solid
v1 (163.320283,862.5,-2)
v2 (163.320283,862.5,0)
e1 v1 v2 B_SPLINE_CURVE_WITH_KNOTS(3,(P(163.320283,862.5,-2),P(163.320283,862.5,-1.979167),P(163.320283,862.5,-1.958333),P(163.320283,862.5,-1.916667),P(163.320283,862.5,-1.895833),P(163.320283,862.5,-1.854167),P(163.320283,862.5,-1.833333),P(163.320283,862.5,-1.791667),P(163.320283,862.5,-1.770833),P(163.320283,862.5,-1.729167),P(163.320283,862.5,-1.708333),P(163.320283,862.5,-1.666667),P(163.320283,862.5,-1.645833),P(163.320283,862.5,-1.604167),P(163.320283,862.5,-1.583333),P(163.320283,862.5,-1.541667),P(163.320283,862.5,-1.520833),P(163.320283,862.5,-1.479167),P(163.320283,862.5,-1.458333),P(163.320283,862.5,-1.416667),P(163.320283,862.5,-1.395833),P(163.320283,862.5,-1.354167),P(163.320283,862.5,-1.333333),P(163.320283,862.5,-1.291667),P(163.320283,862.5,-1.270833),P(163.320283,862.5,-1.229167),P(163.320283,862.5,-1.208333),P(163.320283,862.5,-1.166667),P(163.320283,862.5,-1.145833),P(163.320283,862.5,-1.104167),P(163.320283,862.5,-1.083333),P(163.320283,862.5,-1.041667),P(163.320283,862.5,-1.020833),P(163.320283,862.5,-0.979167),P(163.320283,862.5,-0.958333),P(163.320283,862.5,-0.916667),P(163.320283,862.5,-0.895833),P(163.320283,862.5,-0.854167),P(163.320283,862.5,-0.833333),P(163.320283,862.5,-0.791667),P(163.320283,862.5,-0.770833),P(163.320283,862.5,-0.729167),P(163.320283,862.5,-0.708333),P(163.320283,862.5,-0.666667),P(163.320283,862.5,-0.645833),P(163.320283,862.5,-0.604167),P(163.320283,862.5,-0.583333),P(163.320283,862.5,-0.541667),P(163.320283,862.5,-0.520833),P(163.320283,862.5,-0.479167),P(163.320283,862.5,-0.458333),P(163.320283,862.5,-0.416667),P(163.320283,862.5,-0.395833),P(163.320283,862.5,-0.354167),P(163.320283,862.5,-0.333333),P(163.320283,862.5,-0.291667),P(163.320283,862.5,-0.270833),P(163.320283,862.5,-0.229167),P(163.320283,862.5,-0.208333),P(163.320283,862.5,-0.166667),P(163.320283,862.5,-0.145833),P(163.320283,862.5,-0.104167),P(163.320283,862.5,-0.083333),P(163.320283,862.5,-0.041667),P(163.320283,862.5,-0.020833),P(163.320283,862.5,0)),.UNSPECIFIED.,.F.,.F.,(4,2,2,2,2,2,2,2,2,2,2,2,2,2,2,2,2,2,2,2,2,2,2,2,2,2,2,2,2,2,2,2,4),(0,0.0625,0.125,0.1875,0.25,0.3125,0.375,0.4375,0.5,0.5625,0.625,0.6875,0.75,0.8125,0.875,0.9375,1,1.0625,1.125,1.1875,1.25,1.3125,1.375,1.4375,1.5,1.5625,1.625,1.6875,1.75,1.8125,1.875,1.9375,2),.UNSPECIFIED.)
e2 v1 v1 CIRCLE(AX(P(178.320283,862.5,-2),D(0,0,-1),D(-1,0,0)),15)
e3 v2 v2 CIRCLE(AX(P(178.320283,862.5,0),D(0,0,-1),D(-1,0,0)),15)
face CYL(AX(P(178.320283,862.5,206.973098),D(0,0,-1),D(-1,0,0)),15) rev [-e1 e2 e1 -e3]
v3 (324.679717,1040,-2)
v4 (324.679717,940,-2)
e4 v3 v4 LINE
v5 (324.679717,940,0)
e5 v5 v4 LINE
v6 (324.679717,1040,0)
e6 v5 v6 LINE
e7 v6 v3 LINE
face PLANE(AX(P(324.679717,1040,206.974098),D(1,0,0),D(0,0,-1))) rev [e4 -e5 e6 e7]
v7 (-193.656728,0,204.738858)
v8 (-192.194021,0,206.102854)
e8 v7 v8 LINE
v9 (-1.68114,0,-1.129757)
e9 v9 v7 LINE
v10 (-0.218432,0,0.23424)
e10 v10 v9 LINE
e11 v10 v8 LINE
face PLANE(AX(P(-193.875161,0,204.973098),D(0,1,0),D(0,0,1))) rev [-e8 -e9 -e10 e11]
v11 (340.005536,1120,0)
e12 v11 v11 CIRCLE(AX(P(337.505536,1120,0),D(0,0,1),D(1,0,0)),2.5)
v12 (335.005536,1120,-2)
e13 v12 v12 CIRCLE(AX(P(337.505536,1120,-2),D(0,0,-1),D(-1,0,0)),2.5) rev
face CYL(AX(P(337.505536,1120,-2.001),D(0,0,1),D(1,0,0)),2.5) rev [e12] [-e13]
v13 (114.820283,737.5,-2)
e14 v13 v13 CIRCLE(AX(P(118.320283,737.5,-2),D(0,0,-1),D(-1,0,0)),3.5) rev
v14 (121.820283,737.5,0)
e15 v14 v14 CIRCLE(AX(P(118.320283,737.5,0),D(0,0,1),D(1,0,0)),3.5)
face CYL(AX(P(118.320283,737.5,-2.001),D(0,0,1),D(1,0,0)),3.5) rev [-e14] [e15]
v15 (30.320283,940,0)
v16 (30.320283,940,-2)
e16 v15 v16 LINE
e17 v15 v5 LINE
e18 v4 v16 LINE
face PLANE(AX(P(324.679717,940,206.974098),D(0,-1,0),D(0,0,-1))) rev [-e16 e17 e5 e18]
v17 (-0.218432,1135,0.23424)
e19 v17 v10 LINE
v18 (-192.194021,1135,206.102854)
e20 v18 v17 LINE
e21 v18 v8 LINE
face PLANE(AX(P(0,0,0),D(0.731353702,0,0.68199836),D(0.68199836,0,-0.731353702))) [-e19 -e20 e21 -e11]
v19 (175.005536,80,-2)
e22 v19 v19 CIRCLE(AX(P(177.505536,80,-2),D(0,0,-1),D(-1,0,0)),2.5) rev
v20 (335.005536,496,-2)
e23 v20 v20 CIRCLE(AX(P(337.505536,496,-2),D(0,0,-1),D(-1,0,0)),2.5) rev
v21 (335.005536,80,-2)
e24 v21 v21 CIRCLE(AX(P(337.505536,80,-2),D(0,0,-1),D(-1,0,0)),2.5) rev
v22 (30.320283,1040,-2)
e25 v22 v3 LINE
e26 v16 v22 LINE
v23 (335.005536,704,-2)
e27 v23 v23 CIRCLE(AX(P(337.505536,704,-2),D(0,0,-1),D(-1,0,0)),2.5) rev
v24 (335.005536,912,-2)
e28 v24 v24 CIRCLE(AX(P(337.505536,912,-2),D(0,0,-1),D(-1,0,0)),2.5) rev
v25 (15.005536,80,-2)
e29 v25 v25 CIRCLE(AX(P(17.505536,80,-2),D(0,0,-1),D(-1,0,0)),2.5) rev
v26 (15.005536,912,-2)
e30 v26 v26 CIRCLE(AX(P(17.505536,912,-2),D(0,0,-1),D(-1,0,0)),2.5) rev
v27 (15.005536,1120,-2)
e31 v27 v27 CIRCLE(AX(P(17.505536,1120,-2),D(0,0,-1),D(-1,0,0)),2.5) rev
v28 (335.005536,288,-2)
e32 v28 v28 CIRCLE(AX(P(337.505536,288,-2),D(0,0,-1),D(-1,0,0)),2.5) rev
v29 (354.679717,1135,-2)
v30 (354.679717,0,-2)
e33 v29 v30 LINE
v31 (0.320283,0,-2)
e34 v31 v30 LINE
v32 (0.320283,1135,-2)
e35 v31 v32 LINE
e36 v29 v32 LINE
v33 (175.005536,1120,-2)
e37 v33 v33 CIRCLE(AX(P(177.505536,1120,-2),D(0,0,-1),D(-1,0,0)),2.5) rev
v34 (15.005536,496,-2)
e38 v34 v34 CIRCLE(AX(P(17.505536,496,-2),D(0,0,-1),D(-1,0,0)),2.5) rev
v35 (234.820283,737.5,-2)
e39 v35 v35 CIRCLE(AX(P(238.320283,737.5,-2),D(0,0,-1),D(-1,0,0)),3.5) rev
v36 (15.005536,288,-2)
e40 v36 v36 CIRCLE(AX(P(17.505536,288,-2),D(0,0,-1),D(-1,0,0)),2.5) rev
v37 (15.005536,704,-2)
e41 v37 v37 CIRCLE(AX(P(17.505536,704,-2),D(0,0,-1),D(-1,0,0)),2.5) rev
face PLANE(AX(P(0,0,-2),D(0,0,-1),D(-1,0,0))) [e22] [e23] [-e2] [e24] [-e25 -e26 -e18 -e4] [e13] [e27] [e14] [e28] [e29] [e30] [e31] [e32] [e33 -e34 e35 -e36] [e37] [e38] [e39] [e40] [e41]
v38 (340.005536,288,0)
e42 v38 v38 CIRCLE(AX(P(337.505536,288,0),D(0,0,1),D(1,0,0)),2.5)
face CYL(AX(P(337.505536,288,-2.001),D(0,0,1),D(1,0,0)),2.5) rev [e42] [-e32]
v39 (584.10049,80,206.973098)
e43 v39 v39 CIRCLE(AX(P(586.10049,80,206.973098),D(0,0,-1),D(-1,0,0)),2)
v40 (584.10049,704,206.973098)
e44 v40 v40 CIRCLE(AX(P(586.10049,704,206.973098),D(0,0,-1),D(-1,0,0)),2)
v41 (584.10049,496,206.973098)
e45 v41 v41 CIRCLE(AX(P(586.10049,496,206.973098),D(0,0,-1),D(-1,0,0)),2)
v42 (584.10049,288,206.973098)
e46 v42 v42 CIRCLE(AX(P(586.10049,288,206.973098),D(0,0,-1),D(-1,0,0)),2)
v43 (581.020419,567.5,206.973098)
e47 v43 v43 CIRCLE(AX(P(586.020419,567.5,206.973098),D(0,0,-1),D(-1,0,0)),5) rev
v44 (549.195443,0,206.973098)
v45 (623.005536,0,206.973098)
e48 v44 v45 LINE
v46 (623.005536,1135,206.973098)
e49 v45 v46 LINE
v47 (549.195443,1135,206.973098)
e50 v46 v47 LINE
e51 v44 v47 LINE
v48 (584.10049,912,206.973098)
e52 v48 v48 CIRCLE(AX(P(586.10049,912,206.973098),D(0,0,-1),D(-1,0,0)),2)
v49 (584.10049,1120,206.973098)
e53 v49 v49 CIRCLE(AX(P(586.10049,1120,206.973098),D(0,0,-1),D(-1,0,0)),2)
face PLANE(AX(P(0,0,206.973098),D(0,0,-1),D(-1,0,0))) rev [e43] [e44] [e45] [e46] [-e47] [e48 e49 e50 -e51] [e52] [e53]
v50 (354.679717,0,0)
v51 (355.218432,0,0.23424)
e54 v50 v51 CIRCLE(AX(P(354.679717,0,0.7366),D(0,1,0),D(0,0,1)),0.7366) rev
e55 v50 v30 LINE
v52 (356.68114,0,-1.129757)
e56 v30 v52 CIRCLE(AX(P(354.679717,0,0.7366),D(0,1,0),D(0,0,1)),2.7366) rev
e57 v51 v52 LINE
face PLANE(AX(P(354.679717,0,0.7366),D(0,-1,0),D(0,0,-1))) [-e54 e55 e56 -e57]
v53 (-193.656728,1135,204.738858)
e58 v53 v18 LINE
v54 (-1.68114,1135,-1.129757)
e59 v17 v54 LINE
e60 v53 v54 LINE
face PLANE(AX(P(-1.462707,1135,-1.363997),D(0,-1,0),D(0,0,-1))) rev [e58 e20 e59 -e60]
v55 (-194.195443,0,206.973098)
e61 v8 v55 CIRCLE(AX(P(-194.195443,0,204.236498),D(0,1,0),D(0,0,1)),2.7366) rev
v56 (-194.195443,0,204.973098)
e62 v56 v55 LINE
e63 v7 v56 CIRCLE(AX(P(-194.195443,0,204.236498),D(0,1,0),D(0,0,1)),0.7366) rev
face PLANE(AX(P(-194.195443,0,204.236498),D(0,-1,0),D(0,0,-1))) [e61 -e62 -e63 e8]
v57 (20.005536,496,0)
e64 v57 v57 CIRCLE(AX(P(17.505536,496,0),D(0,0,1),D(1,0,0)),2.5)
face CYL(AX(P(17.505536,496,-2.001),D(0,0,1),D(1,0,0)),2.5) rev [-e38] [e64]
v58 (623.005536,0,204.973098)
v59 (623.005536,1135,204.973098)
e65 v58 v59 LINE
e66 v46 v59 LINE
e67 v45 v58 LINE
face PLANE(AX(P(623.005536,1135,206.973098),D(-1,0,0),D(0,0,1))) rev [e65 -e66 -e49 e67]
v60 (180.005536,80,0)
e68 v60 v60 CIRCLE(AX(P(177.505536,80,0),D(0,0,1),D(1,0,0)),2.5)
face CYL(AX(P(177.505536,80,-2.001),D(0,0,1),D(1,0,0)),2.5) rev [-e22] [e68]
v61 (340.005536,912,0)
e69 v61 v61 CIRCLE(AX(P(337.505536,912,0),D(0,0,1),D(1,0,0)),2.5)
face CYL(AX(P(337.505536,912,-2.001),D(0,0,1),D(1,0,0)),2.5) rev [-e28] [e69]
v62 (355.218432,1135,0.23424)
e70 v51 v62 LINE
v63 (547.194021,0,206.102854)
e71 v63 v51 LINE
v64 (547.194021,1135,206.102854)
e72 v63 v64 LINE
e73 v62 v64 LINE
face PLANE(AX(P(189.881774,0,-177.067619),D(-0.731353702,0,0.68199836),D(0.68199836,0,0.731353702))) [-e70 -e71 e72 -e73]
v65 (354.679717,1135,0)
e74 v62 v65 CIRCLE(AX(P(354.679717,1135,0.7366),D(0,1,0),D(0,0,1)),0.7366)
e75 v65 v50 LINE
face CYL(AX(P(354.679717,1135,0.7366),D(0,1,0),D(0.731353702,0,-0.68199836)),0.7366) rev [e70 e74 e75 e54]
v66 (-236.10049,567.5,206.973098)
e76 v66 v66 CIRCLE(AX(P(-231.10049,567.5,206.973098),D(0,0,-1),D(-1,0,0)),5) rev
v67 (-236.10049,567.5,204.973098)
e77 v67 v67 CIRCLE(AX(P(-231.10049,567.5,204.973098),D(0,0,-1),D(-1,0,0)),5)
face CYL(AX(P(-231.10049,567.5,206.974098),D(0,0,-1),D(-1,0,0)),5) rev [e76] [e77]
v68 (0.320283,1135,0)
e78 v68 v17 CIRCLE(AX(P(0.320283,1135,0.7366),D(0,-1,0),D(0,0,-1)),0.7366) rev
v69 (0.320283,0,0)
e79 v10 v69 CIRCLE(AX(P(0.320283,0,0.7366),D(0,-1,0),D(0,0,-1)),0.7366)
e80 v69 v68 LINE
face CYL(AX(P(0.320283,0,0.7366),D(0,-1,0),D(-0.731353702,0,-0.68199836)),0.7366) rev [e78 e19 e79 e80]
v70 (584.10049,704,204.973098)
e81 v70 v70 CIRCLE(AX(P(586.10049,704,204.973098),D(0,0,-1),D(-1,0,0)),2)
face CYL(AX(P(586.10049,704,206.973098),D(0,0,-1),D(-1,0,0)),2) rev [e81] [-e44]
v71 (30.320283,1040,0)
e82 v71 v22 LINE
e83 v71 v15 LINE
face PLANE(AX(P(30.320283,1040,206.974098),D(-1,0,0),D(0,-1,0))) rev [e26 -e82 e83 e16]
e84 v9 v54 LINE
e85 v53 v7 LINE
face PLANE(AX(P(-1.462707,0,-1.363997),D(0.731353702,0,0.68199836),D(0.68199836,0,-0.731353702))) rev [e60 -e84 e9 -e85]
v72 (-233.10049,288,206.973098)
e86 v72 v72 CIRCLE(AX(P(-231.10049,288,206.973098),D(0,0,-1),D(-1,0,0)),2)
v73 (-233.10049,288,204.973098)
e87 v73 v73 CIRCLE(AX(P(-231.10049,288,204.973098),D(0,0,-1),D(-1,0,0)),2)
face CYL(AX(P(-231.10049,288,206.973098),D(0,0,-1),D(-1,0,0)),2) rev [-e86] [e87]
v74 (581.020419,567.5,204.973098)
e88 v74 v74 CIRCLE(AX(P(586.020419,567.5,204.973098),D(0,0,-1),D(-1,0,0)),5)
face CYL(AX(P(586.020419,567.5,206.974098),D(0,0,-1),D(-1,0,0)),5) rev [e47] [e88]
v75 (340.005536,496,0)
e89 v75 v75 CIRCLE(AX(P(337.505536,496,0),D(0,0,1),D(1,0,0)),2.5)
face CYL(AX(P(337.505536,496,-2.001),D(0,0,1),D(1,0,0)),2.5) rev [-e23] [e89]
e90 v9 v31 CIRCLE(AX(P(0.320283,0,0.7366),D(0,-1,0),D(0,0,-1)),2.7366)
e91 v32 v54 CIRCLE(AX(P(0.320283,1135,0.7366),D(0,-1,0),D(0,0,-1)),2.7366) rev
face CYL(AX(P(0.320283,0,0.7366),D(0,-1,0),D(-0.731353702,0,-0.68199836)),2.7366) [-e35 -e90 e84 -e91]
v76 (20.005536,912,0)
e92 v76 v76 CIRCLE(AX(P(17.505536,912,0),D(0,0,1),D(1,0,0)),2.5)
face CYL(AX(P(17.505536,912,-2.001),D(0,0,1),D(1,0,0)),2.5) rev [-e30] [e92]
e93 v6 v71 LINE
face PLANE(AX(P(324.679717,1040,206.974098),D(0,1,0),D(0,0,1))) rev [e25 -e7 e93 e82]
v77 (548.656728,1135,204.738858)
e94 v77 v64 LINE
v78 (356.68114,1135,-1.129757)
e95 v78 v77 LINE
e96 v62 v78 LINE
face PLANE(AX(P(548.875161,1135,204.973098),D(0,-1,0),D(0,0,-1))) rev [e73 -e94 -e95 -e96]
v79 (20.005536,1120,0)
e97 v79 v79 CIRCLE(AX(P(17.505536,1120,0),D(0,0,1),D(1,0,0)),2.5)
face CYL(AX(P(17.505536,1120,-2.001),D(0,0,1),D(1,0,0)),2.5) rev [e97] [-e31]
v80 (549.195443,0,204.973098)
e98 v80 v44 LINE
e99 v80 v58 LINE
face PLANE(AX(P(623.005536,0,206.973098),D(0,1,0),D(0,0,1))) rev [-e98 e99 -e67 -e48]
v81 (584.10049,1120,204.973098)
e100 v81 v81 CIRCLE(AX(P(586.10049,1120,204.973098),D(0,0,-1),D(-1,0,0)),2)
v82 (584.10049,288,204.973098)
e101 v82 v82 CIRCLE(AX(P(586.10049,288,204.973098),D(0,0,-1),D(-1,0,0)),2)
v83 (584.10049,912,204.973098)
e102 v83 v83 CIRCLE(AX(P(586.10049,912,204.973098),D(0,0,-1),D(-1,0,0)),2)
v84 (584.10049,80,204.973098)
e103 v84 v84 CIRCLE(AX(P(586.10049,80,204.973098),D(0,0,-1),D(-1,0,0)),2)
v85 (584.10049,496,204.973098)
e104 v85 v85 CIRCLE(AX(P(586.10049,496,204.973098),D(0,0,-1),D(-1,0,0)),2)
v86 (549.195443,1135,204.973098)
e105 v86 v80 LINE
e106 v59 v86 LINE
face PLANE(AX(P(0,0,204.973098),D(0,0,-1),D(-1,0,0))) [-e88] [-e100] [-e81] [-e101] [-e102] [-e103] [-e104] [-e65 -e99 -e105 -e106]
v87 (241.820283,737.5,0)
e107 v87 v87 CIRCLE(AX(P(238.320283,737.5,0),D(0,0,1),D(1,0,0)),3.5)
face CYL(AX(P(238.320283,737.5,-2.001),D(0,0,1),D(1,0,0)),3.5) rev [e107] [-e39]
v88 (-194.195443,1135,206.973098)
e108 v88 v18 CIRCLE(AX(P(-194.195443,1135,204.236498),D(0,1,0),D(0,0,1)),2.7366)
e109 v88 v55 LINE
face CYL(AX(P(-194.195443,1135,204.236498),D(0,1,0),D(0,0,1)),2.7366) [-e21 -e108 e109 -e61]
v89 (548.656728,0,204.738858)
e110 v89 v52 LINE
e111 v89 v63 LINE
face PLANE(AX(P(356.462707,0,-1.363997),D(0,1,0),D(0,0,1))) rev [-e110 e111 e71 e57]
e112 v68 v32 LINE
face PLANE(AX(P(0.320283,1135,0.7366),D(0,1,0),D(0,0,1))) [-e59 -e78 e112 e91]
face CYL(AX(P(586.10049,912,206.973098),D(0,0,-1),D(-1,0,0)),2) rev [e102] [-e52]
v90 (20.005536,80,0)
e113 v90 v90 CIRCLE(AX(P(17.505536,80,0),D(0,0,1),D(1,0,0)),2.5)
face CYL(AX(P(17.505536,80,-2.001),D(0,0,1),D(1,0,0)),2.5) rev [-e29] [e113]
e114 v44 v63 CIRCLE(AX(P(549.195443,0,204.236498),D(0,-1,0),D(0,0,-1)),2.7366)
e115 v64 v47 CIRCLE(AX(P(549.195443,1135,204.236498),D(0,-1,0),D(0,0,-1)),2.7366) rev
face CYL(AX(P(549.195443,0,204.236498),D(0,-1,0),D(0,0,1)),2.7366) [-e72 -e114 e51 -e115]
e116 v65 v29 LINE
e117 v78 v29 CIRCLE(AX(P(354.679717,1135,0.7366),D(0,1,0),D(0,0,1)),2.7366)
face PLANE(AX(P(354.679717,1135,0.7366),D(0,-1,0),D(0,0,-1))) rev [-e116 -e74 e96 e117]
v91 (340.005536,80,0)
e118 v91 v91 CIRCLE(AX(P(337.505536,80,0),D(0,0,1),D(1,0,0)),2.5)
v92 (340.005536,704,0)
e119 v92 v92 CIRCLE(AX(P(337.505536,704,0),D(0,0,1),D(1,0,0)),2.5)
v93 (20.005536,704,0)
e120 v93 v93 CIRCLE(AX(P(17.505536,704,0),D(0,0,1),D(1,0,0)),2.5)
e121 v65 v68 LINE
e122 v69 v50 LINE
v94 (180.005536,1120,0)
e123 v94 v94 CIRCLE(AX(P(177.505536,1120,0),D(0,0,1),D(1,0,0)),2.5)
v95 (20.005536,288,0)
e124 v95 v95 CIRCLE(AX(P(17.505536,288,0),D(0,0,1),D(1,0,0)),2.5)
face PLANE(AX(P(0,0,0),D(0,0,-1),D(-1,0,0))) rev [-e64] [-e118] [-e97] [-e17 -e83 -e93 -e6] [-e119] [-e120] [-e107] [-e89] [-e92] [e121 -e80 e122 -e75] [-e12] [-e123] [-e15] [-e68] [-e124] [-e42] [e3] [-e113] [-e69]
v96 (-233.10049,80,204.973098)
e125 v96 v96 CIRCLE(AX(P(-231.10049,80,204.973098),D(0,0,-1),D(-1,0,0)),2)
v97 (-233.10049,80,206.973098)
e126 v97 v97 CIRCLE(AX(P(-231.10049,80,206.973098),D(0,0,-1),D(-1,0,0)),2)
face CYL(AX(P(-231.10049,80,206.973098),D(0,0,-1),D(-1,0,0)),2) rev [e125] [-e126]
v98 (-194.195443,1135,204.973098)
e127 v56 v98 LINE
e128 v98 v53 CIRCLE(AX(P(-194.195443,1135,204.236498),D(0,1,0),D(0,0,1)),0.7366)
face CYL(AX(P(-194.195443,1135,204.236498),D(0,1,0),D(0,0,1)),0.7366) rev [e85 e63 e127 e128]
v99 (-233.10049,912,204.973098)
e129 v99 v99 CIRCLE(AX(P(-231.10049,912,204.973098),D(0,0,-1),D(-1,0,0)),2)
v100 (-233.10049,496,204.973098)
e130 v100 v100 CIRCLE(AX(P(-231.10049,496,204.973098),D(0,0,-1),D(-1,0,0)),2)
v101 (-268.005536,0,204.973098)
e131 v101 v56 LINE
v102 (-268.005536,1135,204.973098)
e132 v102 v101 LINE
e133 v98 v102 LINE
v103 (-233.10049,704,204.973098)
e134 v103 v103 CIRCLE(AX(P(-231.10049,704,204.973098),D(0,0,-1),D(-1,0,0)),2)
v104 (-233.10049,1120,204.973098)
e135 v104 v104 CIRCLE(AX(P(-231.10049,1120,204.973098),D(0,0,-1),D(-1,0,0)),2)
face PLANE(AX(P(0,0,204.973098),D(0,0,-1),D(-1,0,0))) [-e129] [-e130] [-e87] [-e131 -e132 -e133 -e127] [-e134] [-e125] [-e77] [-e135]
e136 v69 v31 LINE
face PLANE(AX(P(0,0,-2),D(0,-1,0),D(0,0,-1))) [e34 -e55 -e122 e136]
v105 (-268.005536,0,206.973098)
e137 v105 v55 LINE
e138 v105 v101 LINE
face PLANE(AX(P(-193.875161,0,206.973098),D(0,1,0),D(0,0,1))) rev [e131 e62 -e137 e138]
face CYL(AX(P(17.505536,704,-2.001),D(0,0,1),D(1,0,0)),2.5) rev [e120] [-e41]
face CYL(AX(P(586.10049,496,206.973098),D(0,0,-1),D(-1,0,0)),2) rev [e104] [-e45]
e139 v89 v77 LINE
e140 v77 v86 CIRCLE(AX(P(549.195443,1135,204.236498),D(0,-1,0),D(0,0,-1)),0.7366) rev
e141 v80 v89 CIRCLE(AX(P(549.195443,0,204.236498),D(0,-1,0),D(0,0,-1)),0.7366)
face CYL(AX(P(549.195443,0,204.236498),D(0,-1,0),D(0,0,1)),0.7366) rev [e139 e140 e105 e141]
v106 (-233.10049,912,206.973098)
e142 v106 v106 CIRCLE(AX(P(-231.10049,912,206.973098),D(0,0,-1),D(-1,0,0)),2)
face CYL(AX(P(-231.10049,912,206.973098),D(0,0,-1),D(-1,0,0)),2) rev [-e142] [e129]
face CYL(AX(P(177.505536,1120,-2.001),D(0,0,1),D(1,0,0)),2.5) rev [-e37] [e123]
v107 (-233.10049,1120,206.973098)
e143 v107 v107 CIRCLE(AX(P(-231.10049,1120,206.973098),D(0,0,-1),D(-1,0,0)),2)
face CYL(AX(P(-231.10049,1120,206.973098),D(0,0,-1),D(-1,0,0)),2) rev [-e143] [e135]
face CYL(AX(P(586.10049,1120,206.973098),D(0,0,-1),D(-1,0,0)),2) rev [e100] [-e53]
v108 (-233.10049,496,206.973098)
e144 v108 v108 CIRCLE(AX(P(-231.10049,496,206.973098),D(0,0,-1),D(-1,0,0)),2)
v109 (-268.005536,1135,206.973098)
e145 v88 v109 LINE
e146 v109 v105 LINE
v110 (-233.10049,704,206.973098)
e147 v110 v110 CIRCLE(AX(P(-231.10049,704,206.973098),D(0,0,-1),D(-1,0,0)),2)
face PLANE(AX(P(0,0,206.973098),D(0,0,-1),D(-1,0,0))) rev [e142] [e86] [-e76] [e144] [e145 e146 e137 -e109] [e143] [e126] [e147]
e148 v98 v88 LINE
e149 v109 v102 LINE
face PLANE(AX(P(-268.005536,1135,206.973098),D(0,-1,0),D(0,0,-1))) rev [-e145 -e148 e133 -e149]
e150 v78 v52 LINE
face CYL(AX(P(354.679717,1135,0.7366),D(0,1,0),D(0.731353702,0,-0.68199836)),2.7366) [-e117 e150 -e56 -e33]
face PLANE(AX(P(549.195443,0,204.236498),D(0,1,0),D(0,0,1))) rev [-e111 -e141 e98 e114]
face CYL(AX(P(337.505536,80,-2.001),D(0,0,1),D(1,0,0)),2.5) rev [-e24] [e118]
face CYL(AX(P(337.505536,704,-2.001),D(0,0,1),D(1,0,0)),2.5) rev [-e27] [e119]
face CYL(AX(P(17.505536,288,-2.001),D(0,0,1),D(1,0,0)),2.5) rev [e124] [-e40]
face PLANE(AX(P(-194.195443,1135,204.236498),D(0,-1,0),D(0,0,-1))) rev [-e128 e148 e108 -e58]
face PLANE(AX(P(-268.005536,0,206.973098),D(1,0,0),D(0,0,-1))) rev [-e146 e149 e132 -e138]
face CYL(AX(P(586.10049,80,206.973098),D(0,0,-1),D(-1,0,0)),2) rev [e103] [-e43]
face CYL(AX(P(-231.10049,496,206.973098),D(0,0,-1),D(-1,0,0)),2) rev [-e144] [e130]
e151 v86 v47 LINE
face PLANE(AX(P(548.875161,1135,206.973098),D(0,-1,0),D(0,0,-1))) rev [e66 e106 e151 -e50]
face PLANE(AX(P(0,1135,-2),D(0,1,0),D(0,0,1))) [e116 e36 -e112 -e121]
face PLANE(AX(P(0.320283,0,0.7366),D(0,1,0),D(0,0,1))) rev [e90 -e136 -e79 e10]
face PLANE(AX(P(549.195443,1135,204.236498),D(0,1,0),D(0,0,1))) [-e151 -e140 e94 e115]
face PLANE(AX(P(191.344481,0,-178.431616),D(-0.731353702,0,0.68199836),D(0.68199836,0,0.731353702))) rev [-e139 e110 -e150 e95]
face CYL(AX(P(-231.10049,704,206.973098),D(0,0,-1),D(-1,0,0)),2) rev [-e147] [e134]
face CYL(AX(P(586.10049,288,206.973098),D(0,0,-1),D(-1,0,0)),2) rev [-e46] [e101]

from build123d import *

# Parameters (mm, degrees)
SKETCH_1_W                         = 355
SKETCH_1_H                         = 1135
SM_BASE_FLANGE_2_DEPTH             = 2
SM_EDGE_FLANGE_1_STRIP_CUT_DEPTH   = 1135
SM_EDGE_FLANGE_1_STRIP_CUT_2_DEPTH = 1135
SM_EDGE_FLANGE_1_DEPTH             = 1135
SM_EDGE_FLANGE_1_BEND_DEPTH        = 1135
SM_EDGE_FLANGE_2_STRIP_CUT_DEPTH   = 1135
SM_EDGE_FLANGE_2_STRIP_CUT_2_DEPTH = 1135
SM_EDGE_FLANGE_2_DEPTH             = 1135
SM_EDGE_FLANGE_2_BEND_DEPTH        = 1135
CUT_EXTRUDE_1_REACH                = 1313.499
SKETCH_30_W                        = 294.35943441
SKETCH_30_H                        = 100
CUT_EXTRUDE_2_REACH                = 1313.182
SKETCH_31_R                        = 5
CUT_EXTRUDE_3_REACH                = 1313.182
SKETCH_32_R                        = 3.5
CUT_EXTRUDE_4_REACH                = 1313.182
SKETCH_33_R                        = 2.5
SKETCH_34_R                        = 15
CUT_EXTRUDE_5_DEPTH                = 1312.499391255
SKETCH_35_R                        = 2
CUT_EXTRUDE_6_DEPTH                = 1312.182199724


# Sheet-metal steps are written as plain solids
with BuildPart() as part:
    # Эскиз1 → Базовая кромка2 (new body)
    with BuildSketch(Plane.XY):
        with Locations((177.5, 567.5)):
            Rectangle(SKETCH_1_W, SKETCH_1_H)
    extrude(amount=-SM_BASE_FLANGE_2_DEPTH)

    # Ребро-кромка1 strip (across the edge) → Ребро-кромка1 strip cut (cut)
    with BuildSketch(Plane(origin=(0, 1135, 0), x_dir=(0.731353701619167, 0, 0.6819983600625024), z_dir=(0, -1, 0))):
        Polygon((-8.058016598, 4.77956712), (-1.129756712, -1.681139744), (0.234240008, -0.218432341), (-6.694019878, 6.242274523), align=None)
    extrude(amount=SM_EDGE_FLANGE_1_STRIP_CUT_DEPTH, mode=Mode.SUBTRACT)

    # Ребро-кромка1 strip 2 (across the edge) → Ребро-кромка1 strip cut 2 (cut)
    with BuildSketch(Plane(origin=(355, 0, 0), x_dir=(-0.731353701619167, 0, 0.6819983600625024), z_dir=(0, 1, 0))):
        Polygon((-8.058016598, 4.77956712), (-1.129756712, -1.681139744), (0.234240008, -0.218432341), (-6.694019878, 6.242274523), align=None)
    extrude(amount=SM_EDGE_FLANGE_1_STRIP_CUT_2_DEPTH, mode=Mode.SUBTRACT)

    # Ребро-кромка1 section (across the edge) → Ребро-кромка1 (add)
    with BuildSketch(Plane(origin=(0, 1135, 0), x_dir=(0.731353701619167, 0, 0.6819983600625024), z_dir=(0, -1, 0))):
        with BuildLine():
            Line((-2, 0.320282795), (-2, 282.13037525))
            Line((-2, 282.13037525), (0, 282.13037525))
            Line((0, 282.13037525), (0, 0.320282795))
            ThreePointArc((0, 0.320282795), (0.061093549, 0.026564231), (0.234240008, -0.218432341))
            Line((0.234240008, -0.218432341), (-1.129756712, -1.681139744))
            ThreePointArc((-1.129756712, -1.681139744), (-1.7730266, -0.770933907), (-2, 0.320282795))
        make_face()
    extrude(amount=SM_EDGE_FLANGE_1_DEPTH)

    # Ребро-кромка1 section 2 (across the edge) → Ребро-кромка1 bend (add)
    with BuildSketch(Plane(origin=(355, 0, 0), x_dir=(-0.731353701619167, 0, 0.6819983600625024), z_dir=(0, 1, 0))):
        with BuildLine():
            Line((-2, 0.320282795), (-2, 282.13037525))
            Line((-2, 282.13037525), (0, 282.13037525))
            Line((0, 282.13037525), (0, 0.320282795))
            ThreePointArc((0, 0.320282795), (0.061093549, 0.026564231), (0.234240008, -0.218432341))
            Line((0.234240008, -0.218432341), (-1.129756712, -1.681139744))
            ThreePointArc((-1.129756712, -1.681139744), (-1.7730266, -0.770933907), (-2, 0.320282795))
        make_face()
    extrude(amount=SM_EDGE_FLANGE_1_BEND_DEPTH)

    # Ребро-кромка2 strip (across the edge) → Ребро-кромка2 strip cut (cut)
    with BuildSketch(Plane(origin=(548.875160648, 1135, 204.973097558), x_dir=(0, 0, -1), z_dir=(0, -1, 0))):
        Polygon((-8.058016598, 4.77956712), (-1.129756712, -1.681139744), (0.234240008, -0.218432341), (-6.694019878, 6.242274523), align=None)
    extrude(amount=SM_EDGE_FLANGE_2_STRIP_CUT_DEPTH, mode=Mode.SUBTRACT)

    # Ребро-кромка2 strip 2 (across the edge) → Ребро-кромка2 strip cut 2 (cut)
    with BuildSketch(Plane(origin=(-193.875160648, 0, 204.973097558), x_dir=(0, 0, -1), z_dir=(0, 1, 0))):
        Polygon((-8.058016598, 4.77956712), (-1.129756712, -1.681139744), (0.234240008, -0.218432341), (-6.694019878, 6.242274523), align=None)
    extrude(amount=SM_EDGE_FLANGE_2_STRIP_CUT_2_DEPTH, mode=Mode.SUBTRACT)

    # Ребро-кромка2 section (across the edge) → Ребро-кромка2 (add)
    with BuildSketch(Plane(origin=(548.875160648, 1135, 204.973097558), x_dir=(0, 0, -1), z_dir=(0, -1, 0))):
        with BuildLine():
            Line((-2, 0.320282795), (-2, 74.13037525))
            Line((-2, 74.13037525), (0, 74.13037525))
            Line((0, 74.13037525), (0, 0.320282795))
            ThreePointArc((0, 0.320282795), (0.061093549, 0.026564231), (0.234240008, -0.218432341))
            Line((0.234240008, -0.218432341), (-1.129756712, -1.681139744))
            ThreePointArc((-1.129756712, -1.681139744), (-1.7730266, -0.770933907), (-2, 0.320282795))
        make_face()
    extrude(amount=SM_EDGE_FLANGE_2_DEPTH)

    # Ребро-кромка2 section 2 (across the edge) → Ребро-кромка2 bend (add)
    with BuildSketch(Plane(origin=(-193.875160648, 0, 204.973097558), x_dir=(0, 0, -1), z_dir=(0, 1, 0))):
        with BuildLine():
            Line((-2, 0.320282795), (-2, 74.13037525))
            Line((-2, 74.13037525), (0, 74.13037525))
            Line((0, 74.13037525), (0, 0.320282795))
            ThreePointArc((0, 0.320282795), (0.061093549, 0.026564231), (0.234240008, -0.218432341))
            Line((0.234240008, -0.218432341), (-1.129756712, -1.681139744))
            ThreePointArc((-1.129756712, -1.681139744), (-1.7730266, -0.770933907), (-2, 0.320282795))
        make_face()
    extrude(amount=SM_EDGE_FLANGE_2_BEND_DEPTH)

    # Эскиз30 → Вырез-Вытянуть1 (cut, up to next)
    with BuildSketch(Plane(origin=(0, 0, -2), x_dir=(-1, 0, 0), z_dir=(0, 0, -1)), mode=Mode.PRIVATE) as cut_extrude_1_sk1:
        with Locations((-177.5, 990)):
            Rectangle(SKETCH_30_W, SKETCH_30_H)
    cut_extrude_1_tool1 = extrude(cut_extrude_1_sk1.sketch, amount=-CUT_EXTRUDE_1_REACH, mode=Mode.PRIVATE) & part.part
    add(cut_extrude_1_tool1.solids().sort_by_distance((177.5, 990, -2))[0], mode=Mode.SUBTRACT)

    # Эскиз31 → Вырез-Вытянуть2 (cut, up to next)
    with BuildSketch(Plane(origin=(0, 0, 204.973097558), x_dir=(-1, 0, 0), z_dir=(0, 0, -1)), mode=Mode.PRIVATE) as cut_extrude_2_sk1:
        with Locations((-586.020418971, 567.5)):
            Circle(SKETCH_31_R)
    cut_extrude_2_tool1 = extrude(cut_extrude_2_sk1.sketch, amount=-CUT_EXTRUDE_2_REACH, mode=Mode.PRIVATE) & part.part
    # Эскиз31 → Вырез-Вытянуть2 (cut, up to next)
    with BuildSketch(Plane(origin=(0, 0, 204.973097558), x_dir=(-1, 0, 0), z_dir=(0, 0, -1)), mode=Mode.PRIVATE) as cut_extrude_2_sk2:
        with Locations((231.10048967, 567.5)):
            Circle(SKETCH_31_R)
    cut_extrude_2_tool2 = extrude(cut_extrude_2_sk2.sketch, amount=-CUT_EXTRUDE_2_REACH, mode=Mode.PRIVATE) & part.part
    add(cut_extrude_2_tool1.solids().sort_by_distance((586.020419, 567.5, 204.973098))[0], mode=Mode.SUBTRACT)
    add(cut_extrude_2_tool2.solids().sort_by_distance((-231.10049, 567.5, 204.973098))[0], mode=Mode.SUBTRACT)

    # Эскиз32 → Вырез-Вытянуть3 (cut, up to next)
    with BuildSketch(Plane.XY, mode=Mode.PRIVATE) as cut_extrude_3_sk1:
        with Locations((118.320282795, 737.5)):
            Circle(SKETCH_32_R)
    cut_extrude_3_tool1 = extrude(cut_extrude_3_sk1.sketch, amount=-CUT_EXTRUDE_3_REACH, mode=Mode.PRIVATE) & part.part
    # Эскиз32 → Вырез-Вытянуть3 (cut, up to next)
    with BuildSketch(Plane.XY, mode=Mode.PRIVATE) as cut_extrude_3_sk2:
        with Locations((238.320282795, 737.5)):
            Circle(SKETCH_32_R)
    cut_extrude_3_tool2 = extrude(cut_extrude_3_sk2.sketch, amount=-CUT_EXTRUDE_3_REACH, mode=Mode.PRIVATE) & part.part
    add(cut_extrude_3_tool1.solids().sort_by_distance((118.320283, 737.5, 0))[0], mode=Mode.SUBTRACT)
    add(cut_extrude_3_tool2.solids().sort_by_distance((238.320283, 737.5, 0))[0], mode=Mode.SUBTRACT)

    # Эскиз33 → Вырез-Вытянуть4 (cut, up to next)
    with BuildSketch(Plane.XY, mode=Mode.PRIVATE) as cut_extrude_4_sk1:
        with Locations((17.505535898, 1120)):
            Circle(SKETCH_33_R)
    cut_extrude_4_tool1 = extrude(cut_extrude_4_sk1.sketch, amount=-CUT_EXTRUDE_4_REACH, mode=Mode.PRIVATE) & part.part
    # Эскиз33 → Вырез-Вытянуть4 (cut, up to next)
    with BuildSketch(Plane.XY, mode=Mode.PRIVATE) as cut_extrude_4_sk2:
        with Locations((177.505535898, 1120)):
            Circle(SKETCH_33_R)
    cut_extrude_4_tool2 = extrude(cut_extrude_4_sk2.sketch, amount=-CUT_EXTRUDE_4_REACH, mode=Mode.PRIVATE) & part.part
    # Эскиз33 → Вырез-Вытянуть4 (cut, up to next)
    with BuildSketch(Plane.XY, mode=Mode.PRIVATE) as cut_extrude_4_sk3:
        with Locations((337.505535898, 1120)):
            Circle(SKETCH_33_R)
    cut_extrude_4_tool3 = extrude(cut_extrude_4_sk3.sketch, amount=-CUT_EXTRUDE_4_REACH, mode=Mode.PRIVATE) & part.part
    # Эскиз33 → Вырез-Вытянуть4 (cut, up to next)
    with BuildSketch(Plane.XY, mode=Mode.PRIVATE) as cut_extrude_4_sk4:
        with Locations((17.505535898, 912)):
            Circle(SKETCH_33_R)
    cut_extrude_4_tool4 = extrude(cut_extrude_4_sk4.sketch, amount=-CUT_EXTRUDE_4_REACH, mode=Mode.PRIVATE) & part.part
    # Эскиз33 → Вырез-Вытянуть4 (cut, up to next)
    with BuildSketch(Plane.XY, mode=Mode.PRIVATE) as cut_extrude_4_sk5:
        with Locations((17.505535898, 704)):
            Circle(SKETCH_33_R)
    cut_extrude_4_tool5 = extrude(cut_extrude_4_sk5.sketch, amount=-CUT_EXTRUDE_4_REACH, mode=Mode.PRIVATE) & part.part
    # Эскиз33 → Вырез-Вытянуть4 (cut, up to next)
    with BuildSketch(Plane.XY, mode=Mode.PRIVATE) as cut_extrude_4_sk6:
        with Locations((17.505535898, 496)):
            Circle(SKETCH_33_R)
    cut_extrude_4_tool6 = extrude(cut_extrude_4_sk6.sketch, amount=-CUT_EXTRUDE_4_REACH, mode=Mode.PRIVATE) & part.part
    # Эскиз33 → Вырез-Вытянуть4 (cut, up to next)
    with BuildSketch(Plane.XY, mode=Mode.PRIVATE) as cut_extrude_4_sk7:
        with Locations((17.505535898, 288)):
            Circle(SKETCH_33_R)
    cut_extrude_4_tool7 = extrude(cut_extrude_4_sk7.sketch, amount=-CUT_EXTRUDE_4_REACH, mode=Mode.PRIVATE) & part.part
    # Эскиз33 → Вырез-Вытянуть4 (cut, up to next)
    with BuildSketch(Plane.XY, mode=Mode.PRIVATE) as cut_extrude_4_sk8:
        with Locations((17.505535898, 80)):
            Circle(SKETCH_33_R)
    cut_extrude_4_tool8 = extrude(cut_extrude_4_sk8.sketch, amount=-CUT_EXTRUDE_4_REACH, mode=Mode.PRIVATE) & part.part
    # Эскиз33 → Вырез-Вытянуть4 (cut, up to next)
    with BuildSketch(Plane.XY, mode=Mode.PRIVATE) as cut_extrude_4_sk9:
        with Locations((177.505535898, 80)):
            Circle(SKETCH_33_R)
    cut_extrude_4_tool9 = extrude(cut_extrude_4_sk9.sketch, amount=-CUT_EXTRUDE_4_REACH, mode=Mode.PRIVATE) & part.part
    # Эскиз33 → Вырез-Вытянуть4 (cut, up to next)
    with BuildSketch(Plane.XY, mode=Mode.PRIVATE) as cut_extrude_4_sk10:
        with Locations((337.505535898, 80)):
            Circle(SKETCH_33_R)
    cut_extrude_4_tool10 = extrude(cut_extrude_4_sk10.sketch, amount=-CUT_EXTRUDE_4_REACH, mode=Mode.PRIVATE) & part.part
    # Эскиз33 → Вырез-Вытянуть4 (cut, up to next)
    with BuildSketch(Plane.XY, mode=Mode.PRIVATE) as cut_extrude_4_sk11:
        with Locations((337.505535898, 496)):
            Circle(SKETCH_33_R)
    cut_extrude_4_tool11 = extrude(cut_extrude_4_sk11.sketch, amount=-CUT_EXTRUDE_4_REACH, mode=Mode.PRIVATE) & part.part
    # Эскиз33 → Вырез-Вытянуть4 (cut, up to next)
    with BuildSketch(Plane.XY, mode=Mode.PRIVATE) as cut_extrude_4_sk12:
        with Locations((337.505535898, 288)):
            Circle(SKETCH_33_R)
    cut_extrude_4_tool12 = extrude(cut_extrude_4_sk12.sketch, amount=-CUT_EXTRUDE_4_REACH, mode=Mode.PRIVATE) & part.part
    # Эскиз33 → Вырез-Вытянуть4 (cut, up to next)
    with BuildSketch(Plane.XY, mode=Mode.PRIVATE) as cut_extrude_4_sk13:
        with Locations((337.505535898, 704)):
            Circle(SKETCH_33_R)
    cut_extrude_4_tool13 = extrude(cut_extrude_4_sk13.sketch, amount=-CUT_EXTRUDE_4_REACH, mode=Mode.PRIVATE) & part.part
    # Эскиз33 → Вырез-Вытянуть4 (cut, up to next)
    with BuildSketch(Plane.XY, mode=Mode.PRIVATE) as cut_extrude_4_sk14:
        with Locations((337.505535898, 912)):
            Circle(SKETCH_33_R)
    cut_extrude_4_tool14 = extrude(cut_extrude_4_sk14.sketch, amount=-CUT_EXTRUDE_4_REACH, mode=Mode.PRIVATE) & part.part
    add(cut_extrude_4_tool1.solids().sort_by_distance((17.505536, 1120, 0))[0], mode=Mode.SUBTRACT)
    add(cut_extrude_4_tool2.solids().sort_by_distance((177.505536, 1120, 0))[0], mode=Mode.SUBTRACT)
    add(cut_extrude_4_tool3.solids().sort_by_distance((337.505536, 1120, 0))[0], mode=Mode.SUBTRACT)
    add(cut_extrude_4_tool4.solids().sort_by_distance((17.505536, 912, 0))[0], mode=Mode.SUBTRACT)
    add(cut_extrude_4_tool5.solids().sort_by_distance((17.505536, 704, 0))[0], mode=Mode.SUBTRACT)
    add(cut_extrude_4_tool6.solids().sort_by_distance((17.505536, 496, 0))[0], mode=Mode.SUBTRACT)
    add(cut_extrude_4_tool7.solids().sort_by_distance((17.505536, 288, 0))[0], mode=Mode.SUBTRACT)
    add(cut_extrude_4_tool8.solids().sort_by_distance((17.505536, 80, 0))[0], mode=Mode.SUBTRACT)
    add(cut_extrude_4_tool9.solids().sort_by_distance((177.505536, 80, 0))[0], mode=Mode.SUBTRACT)
    add(cut_extrude_4_tool10.solids().sort_by_distance((337.505536, 80, 0))[0], mode=Mode.SUBTRACT)
    add(cut_extrude_4_tool11.solids().sort_by_distance((337.505536, 496, 0))[0], mode=Mode.SUBTRACT)
    add(cut_extrude_4_tool12.solids().sort_by_distance((337.505536, 288, 0))[0], mode=Mode.SUBTRACT)
    add(cut_extrude_4_tool13.solids().sort_by_distance((337.505536, 704, 0))[0], mode=Mode.SUBTRACT)
    add(cut_extrude_4_tool14.solids().sort_by_distance((337.505536, 912, 0))[0], mode=Mode.SUBTRACT)

    # Эскиз34 → Вырез-Вытянуть5 (cut, through all)
    with BuildSketch(Plane(origin=(0, 0, -2), x_dir=(-1, 0, 0), z_dir=(0, 0, -1))):
        with Locations((-178.320282795, 862.5)):
            Circle(SKETCH_34_R)
    extrude(amount=-CUT_EXTRUDE_5_DEPTH, mode=Mode.SUBTRACT)

    # Эскиз35 → Вырез-Вытянуть6 (cut, through all)
    with BuildSketch(Plane(origin=(0, 0, 204.973097558), x_dir=(-1, 0, 0), z_dir=(0, 0, -1))):
        with Locations((-586.10048967, 1120)):
            Circle(SKETCH_35_R)
        with Locations((-586.10048967, 912)):
            Circle(SKETCH_35_R)
        with Locations((-586.10048967, 704)):
            Circle(SKETCH_35_R)
        with Locations((-586.10048967, 496)):
            Circle(SKETCH_35_R)
        with Locations((-586.10048967, 288)):
            Circle(SKETCH_35_R)
        with Locations((-586.10048967, 80)):
            Circle(SKETCH_35_R)
        with Locations((231.10048967, 80)):
            Circle(SKETCH_35_R)
        with Locations((231.10048967, 288)):
            Circle(SKETCH_35_R)
        with Locations((231.10048967, 496)):
            Circle(SKETCH_35_R)
        with Locations((231.10048967, 704)):
            Circle(SKETCH_35_R)
        with Locations((231.10048967, 912)):
            Circle(SKETCH_35_R)
        with Locations((231.10048967, 1120)):
            Circle(SKETCH_35_R)
    extrude(amount=-CUT_EXTRUDE_6_DEPTH, mode=Mode.SUBTRACT)


solid = part.part
